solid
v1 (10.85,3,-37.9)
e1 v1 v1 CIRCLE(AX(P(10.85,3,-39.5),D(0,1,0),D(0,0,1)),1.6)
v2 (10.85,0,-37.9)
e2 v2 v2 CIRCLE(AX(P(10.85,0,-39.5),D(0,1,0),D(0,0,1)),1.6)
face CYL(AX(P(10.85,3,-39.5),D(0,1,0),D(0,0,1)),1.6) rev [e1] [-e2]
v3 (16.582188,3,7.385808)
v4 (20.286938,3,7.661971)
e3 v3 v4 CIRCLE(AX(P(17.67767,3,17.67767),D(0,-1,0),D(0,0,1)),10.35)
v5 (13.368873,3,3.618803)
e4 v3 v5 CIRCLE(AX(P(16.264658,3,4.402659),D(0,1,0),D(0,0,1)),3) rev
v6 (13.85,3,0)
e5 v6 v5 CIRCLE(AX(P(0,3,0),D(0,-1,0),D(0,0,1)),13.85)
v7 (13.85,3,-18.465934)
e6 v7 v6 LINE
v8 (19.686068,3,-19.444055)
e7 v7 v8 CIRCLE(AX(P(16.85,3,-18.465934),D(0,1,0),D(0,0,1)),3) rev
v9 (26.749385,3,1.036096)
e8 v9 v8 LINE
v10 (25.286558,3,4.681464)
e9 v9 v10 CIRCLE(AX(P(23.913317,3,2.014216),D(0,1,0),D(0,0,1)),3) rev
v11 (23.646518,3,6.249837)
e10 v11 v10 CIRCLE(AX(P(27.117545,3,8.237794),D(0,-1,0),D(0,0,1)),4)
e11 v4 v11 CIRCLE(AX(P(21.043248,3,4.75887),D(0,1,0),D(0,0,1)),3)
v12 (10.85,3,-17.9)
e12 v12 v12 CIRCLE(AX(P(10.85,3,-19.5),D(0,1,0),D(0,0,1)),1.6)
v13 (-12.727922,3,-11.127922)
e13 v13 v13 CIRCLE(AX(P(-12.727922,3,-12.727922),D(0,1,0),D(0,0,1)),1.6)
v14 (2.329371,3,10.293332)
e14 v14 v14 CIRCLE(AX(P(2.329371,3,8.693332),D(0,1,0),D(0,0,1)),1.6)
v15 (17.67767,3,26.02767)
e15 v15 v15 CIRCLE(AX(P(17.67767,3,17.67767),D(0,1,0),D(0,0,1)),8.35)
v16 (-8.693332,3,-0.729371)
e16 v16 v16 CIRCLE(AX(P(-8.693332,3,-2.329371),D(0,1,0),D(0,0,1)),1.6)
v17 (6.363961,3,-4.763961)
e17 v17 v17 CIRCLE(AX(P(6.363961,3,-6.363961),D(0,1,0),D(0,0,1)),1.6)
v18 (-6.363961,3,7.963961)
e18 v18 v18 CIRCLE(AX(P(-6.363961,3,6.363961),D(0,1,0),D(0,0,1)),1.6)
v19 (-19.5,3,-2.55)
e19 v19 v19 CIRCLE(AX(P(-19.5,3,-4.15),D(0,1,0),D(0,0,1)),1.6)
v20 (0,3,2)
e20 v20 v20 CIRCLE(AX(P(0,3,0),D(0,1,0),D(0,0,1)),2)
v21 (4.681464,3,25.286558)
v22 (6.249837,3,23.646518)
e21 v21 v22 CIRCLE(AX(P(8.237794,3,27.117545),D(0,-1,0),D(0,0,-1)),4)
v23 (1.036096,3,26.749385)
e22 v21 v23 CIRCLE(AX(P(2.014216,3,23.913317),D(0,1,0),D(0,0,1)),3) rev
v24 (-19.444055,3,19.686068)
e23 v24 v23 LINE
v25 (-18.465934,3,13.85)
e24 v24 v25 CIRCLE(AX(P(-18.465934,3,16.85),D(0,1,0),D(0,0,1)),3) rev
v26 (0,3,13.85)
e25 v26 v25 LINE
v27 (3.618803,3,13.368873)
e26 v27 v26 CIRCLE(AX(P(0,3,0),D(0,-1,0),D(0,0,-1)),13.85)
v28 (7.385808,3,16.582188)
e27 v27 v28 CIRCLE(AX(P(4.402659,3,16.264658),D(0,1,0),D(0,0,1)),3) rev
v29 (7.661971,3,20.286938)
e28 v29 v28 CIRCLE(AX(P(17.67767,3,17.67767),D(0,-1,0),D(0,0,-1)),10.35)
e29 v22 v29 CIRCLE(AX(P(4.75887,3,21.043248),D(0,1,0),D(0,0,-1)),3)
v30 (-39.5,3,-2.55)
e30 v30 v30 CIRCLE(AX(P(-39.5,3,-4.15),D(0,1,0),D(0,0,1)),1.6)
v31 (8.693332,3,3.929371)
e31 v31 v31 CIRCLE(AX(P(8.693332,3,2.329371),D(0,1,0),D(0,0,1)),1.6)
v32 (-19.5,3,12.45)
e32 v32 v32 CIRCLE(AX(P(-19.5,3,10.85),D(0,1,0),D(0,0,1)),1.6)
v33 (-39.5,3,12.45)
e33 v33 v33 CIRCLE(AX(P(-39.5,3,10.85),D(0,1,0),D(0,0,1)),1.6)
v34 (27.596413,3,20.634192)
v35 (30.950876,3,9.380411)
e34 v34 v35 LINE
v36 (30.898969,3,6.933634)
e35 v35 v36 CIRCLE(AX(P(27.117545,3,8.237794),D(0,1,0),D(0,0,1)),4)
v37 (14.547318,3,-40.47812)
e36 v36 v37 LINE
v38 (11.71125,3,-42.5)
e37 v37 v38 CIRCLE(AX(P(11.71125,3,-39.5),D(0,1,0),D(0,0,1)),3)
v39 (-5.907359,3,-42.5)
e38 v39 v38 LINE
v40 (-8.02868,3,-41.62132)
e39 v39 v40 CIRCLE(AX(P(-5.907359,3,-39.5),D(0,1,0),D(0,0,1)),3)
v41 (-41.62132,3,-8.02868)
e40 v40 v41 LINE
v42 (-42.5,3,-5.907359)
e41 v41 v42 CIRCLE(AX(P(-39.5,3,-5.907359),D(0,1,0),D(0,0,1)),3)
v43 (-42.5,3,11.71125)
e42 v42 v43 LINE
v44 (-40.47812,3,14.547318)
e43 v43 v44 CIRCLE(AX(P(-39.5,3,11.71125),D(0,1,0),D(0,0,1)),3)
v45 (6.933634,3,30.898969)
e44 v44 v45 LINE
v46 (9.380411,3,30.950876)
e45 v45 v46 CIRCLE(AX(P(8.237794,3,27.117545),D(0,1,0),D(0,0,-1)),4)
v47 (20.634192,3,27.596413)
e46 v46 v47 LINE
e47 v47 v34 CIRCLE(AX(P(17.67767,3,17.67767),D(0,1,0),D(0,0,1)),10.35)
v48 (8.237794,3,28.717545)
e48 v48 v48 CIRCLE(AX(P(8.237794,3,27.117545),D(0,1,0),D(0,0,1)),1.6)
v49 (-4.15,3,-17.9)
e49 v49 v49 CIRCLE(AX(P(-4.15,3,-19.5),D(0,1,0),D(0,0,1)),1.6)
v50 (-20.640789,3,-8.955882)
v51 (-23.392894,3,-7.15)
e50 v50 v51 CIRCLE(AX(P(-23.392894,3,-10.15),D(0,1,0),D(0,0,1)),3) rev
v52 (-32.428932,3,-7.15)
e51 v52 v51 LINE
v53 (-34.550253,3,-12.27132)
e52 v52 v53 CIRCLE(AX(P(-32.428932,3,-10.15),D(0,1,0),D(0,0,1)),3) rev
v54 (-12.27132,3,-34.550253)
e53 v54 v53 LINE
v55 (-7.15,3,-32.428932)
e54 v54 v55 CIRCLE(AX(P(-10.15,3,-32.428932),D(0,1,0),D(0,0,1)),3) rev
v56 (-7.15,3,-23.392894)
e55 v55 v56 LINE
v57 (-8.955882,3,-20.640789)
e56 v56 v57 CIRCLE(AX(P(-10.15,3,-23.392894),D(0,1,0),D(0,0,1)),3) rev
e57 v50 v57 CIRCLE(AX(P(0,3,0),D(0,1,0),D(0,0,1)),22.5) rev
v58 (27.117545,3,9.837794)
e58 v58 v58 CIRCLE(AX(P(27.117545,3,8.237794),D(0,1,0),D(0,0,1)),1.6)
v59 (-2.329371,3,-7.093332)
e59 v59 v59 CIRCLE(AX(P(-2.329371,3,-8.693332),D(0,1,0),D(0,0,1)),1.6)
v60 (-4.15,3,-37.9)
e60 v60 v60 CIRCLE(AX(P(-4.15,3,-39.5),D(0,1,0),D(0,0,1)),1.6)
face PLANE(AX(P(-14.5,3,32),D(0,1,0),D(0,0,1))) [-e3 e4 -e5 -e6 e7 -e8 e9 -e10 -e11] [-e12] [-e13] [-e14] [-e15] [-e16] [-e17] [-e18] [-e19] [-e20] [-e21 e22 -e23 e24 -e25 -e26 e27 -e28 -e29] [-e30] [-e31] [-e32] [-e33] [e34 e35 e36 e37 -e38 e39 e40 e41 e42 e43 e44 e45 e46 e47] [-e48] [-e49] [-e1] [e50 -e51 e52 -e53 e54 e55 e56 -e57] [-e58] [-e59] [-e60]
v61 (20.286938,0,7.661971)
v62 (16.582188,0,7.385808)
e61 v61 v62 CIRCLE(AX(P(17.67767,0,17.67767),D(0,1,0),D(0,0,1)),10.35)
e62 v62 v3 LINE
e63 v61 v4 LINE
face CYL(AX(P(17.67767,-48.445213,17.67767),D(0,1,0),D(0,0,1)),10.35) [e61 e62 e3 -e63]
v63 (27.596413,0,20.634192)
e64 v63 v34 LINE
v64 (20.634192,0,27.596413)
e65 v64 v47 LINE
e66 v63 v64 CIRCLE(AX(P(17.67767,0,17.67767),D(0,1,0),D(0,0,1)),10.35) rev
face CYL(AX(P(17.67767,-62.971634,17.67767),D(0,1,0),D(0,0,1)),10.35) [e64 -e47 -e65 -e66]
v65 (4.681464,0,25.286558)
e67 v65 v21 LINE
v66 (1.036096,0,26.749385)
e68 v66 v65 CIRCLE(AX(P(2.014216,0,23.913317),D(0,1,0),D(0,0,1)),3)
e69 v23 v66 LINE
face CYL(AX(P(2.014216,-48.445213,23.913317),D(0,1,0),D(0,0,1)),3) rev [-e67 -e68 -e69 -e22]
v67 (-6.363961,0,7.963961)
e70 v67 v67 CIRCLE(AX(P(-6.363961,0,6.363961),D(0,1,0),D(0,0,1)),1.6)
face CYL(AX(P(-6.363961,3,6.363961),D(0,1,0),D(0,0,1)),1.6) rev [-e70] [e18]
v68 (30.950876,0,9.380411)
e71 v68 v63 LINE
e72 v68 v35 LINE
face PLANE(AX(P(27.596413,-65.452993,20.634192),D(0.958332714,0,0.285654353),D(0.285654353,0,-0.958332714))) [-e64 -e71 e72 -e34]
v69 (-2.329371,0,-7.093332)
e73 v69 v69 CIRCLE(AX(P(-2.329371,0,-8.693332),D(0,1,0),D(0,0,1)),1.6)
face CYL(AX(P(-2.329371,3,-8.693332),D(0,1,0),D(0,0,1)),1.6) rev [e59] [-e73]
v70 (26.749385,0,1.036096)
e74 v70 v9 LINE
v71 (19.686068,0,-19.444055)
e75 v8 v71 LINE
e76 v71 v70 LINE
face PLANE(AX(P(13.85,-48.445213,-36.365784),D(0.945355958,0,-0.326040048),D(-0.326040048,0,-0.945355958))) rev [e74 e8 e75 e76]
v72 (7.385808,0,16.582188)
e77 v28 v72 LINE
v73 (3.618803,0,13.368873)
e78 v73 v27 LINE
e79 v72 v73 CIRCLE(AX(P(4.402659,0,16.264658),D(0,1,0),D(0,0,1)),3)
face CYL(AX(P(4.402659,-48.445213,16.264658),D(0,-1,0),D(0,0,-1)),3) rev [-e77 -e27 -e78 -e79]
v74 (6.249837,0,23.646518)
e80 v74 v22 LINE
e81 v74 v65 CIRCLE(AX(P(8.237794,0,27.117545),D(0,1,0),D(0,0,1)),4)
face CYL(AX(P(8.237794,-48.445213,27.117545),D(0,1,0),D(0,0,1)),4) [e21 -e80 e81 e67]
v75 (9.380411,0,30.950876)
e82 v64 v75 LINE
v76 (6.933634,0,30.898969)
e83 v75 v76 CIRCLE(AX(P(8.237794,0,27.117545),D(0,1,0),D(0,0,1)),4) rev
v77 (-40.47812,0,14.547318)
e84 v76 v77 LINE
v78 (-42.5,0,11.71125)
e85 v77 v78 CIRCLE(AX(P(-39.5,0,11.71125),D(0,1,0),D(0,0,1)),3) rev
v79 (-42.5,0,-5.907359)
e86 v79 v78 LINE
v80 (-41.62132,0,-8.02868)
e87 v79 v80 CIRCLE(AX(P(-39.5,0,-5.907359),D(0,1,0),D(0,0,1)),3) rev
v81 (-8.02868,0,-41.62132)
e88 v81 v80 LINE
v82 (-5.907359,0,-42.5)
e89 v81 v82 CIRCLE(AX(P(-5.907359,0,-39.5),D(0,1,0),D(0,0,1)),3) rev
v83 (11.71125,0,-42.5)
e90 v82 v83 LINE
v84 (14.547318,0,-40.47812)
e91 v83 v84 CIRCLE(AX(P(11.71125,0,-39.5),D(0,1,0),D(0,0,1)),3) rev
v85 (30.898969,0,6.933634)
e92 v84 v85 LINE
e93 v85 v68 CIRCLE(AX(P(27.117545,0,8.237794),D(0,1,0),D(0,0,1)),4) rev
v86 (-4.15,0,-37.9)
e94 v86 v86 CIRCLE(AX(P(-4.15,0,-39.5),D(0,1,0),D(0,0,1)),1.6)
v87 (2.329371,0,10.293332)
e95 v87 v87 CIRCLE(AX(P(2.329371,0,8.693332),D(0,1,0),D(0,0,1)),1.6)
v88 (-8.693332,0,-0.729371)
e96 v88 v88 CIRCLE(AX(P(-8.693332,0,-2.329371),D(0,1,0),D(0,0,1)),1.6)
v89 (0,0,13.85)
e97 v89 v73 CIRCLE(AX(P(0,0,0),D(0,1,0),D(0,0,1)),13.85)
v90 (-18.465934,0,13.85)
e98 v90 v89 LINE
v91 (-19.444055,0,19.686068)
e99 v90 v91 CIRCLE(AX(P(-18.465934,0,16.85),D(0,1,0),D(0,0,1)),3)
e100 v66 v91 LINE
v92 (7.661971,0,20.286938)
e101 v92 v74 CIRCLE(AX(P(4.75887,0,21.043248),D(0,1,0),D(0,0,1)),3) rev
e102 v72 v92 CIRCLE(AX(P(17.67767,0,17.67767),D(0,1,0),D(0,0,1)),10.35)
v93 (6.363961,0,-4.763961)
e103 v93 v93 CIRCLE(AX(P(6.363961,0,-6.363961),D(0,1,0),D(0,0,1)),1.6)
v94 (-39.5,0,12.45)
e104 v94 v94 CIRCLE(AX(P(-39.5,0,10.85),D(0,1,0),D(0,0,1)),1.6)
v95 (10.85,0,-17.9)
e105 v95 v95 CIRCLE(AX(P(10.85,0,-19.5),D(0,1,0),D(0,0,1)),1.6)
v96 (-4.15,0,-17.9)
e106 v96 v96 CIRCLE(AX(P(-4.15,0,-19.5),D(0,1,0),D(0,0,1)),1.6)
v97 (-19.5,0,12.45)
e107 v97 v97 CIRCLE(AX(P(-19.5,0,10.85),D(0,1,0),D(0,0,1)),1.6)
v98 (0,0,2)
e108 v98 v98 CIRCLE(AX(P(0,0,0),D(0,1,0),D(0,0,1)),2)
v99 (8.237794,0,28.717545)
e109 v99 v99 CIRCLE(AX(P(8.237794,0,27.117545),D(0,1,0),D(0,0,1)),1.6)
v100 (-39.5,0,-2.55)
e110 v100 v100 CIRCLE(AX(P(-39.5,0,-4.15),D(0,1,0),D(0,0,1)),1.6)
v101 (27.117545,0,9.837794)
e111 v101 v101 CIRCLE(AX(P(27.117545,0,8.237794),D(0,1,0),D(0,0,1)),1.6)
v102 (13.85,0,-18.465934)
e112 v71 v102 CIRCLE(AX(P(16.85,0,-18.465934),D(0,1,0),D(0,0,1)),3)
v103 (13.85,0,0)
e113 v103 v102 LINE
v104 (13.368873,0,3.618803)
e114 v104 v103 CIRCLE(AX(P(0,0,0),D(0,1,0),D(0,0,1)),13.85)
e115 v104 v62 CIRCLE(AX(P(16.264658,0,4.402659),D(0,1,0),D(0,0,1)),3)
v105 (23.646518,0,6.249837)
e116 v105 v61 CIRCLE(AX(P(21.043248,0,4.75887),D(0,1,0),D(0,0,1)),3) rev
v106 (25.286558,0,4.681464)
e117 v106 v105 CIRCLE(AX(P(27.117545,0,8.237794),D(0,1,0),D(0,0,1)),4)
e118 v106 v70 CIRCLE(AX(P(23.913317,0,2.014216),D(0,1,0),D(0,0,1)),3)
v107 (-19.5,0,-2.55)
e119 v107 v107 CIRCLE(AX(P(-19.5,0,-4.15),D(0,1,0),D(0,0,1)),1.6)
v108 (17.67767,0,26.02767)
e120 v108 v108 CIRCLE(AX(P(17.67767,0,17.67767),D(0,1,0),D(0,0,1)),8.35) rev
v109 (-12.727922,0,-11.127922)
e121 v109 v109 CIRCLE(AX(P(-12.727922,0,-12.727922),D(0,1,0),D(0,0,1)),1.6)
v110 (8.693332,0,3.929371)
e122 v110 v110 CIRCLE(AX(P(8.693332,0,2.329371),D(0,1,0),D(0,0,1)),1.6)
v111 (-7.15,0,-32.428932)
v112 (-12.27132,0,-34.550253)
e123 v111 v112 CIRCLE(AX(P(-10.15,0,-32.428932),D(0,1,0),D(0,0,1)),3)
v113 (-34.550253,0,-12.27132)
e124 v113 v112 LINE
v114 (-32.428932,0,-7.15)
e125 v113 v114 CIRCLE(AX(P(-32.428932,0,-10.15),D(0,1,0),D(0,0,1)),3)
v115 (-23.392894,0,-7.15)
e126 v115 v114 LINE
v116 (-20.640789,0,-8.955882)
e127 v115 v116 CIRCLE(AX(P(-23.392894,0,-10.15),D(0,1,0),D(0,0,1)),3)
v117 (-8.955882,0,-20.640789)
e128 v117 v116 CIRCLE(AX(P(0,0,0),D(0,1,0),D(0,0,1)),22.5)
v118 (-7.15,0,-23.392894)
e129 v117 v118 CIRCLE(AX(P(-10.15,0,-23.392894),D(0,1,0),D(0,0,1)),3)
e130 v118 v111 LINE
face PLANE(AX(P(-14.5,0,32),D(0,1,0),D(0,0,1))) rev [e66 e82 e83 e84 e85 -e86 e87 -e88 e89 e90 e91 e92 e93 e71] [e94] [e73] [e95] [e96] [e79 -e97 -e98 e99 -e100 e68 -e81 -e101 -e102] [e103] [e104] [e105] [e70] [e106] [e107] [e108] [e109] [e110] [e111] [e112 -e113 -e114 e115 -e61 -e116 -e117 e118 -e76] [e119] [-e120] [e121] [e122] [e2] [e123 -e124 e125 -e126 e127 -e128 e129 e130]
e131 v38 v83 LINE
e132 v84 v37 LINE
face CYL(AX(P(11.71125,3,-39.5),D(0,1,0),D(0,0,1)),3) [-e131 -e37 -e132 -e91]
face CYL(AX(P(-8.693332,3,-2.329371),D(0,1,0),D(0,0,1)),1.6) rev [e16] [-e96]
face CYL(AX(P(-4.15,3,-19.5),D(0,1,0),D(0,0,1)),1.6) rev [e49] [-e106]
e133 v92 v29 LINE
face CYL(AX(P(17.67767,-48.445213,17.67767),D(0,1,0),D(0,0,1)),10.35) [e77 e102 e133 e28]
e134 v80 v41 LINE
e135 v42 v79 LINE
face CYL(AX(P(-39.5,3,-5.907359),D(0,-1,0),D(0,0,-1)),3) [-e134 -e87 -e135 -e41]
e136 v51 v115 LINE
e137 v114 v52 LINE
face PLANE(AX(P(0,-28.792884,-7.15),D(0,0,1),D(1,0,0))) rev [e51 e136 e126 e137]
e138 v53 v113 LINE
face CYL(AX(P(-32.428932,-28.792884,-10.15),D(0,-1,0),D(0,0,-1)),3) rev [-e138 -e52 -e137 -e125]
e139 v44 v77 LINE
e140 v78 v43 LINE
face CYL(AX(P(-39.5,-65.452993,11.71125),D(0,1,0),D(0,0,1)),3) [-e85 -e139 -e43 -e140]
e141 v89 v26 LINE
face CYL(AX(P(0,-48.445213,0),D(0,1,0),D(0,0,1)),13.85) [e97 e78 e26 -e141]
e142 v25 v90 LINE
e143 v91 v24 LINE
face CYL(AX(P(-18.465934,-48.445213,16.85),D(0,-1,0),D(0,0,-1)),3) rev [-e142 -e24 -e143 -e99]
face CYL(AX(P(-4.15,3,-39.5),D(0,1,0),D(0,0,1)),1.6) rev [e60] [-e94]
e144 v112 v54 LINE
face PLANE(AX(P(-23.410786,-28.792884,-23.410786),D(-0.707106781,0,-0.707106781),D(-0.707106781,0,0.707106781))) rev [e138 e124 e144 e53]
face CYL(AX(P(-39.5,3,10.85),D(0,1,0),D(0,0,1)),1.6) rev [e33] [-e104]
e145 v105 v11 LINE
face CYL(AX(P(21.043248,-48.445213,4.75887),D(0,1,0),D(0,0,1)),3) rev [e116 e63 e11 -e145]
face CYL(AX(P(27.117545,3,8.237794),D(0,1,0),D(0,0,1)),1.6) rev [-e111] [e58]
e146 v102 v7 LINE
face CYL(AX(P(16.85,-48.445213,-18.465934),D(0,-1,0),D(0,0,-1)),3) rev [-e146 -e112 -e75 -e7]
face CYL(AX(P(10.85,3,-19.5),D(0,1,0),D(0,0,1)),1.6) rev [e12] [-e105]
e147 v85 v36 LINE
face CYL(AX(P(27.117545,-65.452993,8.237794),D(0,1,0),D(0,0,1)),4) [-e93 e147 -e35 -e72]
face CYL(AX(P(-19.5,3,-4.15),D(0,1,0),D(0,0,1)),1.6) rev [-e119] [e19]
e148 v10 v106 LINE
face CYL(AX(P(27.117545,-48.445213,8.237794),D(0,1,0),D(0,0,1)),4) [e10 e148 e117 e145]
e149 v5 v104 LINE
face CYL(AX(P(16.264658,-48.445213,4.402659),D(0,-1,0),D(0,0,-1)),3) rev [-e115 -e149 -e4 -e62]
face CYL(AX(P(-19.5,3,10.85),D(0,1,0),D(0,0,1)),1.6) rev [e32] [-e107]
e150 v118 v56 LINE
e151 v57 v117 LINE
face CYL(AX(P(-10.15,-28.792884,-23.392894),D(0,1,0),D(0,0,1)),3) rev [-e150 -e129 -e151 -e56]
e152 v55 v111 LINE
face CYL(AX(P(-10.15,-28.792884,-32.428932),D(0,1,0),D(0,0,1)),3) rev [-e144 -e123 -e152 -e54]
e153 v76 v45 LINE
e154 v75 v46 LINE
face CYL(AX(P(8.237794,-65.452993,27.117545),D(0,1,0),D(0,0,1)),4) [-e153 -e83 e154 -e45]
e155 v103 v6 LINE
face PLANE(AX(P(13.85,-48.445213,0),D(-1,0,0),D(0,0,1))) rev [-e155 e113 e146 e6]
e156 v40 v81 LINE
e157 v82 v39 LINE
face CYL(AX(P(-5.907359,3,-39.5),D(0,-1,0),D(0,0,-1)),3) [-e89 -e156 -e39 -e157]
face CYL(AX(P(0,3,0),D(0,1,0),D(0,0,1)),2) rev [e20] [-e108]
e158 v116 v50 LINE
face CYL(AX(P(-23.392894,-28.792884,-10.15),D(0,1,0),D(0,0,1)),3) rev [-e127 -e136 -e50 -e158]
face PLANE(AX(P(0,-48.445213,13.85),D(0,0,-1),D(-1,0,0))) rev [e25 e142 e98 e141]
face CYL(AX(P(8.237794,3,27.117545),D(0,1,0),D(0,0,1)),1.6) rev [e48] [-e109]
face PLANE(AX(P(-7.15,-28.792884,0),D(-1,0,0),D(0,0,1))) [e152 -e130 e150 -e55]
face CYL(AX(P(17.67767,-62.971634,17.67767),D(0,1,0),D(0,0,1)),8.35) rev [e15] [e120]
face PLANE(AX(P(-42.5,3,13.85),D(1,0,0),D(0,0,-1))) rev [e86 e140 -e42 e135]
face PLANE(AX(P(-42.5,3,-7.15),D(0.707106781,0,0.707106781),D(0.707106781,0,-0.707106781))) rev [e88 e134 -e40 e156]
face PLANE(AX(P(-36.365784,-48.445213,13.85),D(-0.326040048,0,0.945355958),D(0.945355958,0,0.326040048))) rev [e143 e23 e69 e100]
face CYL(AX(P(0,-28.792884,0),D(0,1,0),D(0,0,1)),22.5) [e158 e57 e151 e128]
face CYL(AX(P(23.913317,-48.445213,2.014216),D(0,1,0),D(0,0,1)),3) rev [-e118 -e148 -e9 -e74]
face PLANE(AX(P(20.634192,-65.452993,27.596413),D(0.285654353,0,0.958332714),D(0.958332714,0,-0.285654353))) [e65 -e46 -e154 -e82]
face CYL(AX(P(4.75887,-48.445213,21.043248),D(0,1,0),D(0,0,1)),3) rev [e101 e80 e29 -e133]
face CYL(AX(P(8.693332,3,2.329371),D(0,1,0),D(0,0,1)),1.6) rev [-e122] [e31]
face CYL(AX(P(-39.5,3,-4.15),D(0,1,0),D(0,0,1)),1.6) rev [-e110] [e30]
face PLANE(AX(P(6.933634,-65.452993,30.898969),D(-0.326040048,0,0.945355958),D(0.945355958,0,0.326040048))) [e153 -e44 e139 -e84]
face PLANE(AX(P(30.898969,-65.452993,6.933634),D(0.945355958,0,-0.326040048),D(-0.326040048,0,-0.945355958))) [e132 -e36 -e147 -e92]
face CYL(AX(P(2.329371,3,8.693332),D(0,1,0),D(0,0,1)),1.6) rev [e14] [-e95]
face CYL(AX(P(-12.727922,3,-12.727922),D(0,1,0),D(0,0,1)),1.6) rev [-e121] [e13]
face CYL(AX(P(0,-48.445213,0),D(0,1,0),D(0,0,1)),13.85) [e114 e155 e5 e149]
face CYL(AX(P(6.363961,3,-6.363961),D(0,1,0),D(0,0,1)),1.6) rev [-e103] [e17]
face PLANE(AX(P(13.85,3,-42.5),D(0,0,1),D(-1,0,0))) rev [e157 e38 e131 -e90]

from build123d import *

# Parameters (mm, degrees)
BOSS_EXTRUDE1_DEPTH      = 3
M3_CLEARANCE_HOLE1_D     = 3.2
M3_CLEARANCE_HOLE2_D     = 3.2
F_4_0_4_DIAMETER_HOLE1_D = 4
CUT_EXTRUDE3_DEPTH       = 3
FILLET5_R                = 3
M3_CLEARANCE_HOLE3_D     = 3.2
CUT_EXTRUDE4_START       = -3
CUT_EXTRUDE4_DEPTH       = 3
BOSS_EXTRUDE2_START      = -3
SKETCH17_R               = 8.35
BOSS_EXTRUDE2_DEPTH      = 3
BOSS_EXTRUDE3_START      = -3
BOSS_EXTRUDE3_DEPTH      = 3
M3_CLEARANCE_HOLE4_D     = 3.2
CUT_EXTRUDE5_START       = -3
CUT_EXTRUDE5_DEPTH       = 3
FILLET6_R                = 3
FILLET7_R                = 3


# Some blends are built 0.0001 mm under size
with BuildPart() as part:
    # Sketch2 → Boss-Extrude1 (new body)
    with BuildSketch(Plane(origin=(0, 0, 0), x_dir=(1, 0, 0), z_dir=(0, 1, 0))):
        with BuildLine():
            Line((-16.5, -13.85), (-42.5, -13.85))
            Line((-42.5, -13.85), (-42.5, 7.15))
            Line((-42.5, 7.15), (-24.825, 24.825))
            Line((-24.825, 24.825), (25.724873734, -25.724873734))
            Line((25.724873734, -25.724873734), (16.974873734, -34.474873734))
            ThreePointArc((16.974873734, -34.474873734), (14.482141695, -35.49995444), (12, -34.449489743))
            Line((12, -34.449489743), (12, -39))
            Line((12, -39), (-12, -39))
            Line((-12, -39), (-12, -34.449489743))
            ThreePointArc((-12, -34.449489743), (-17.17260394, -34.259908888), (-16.5, -29.127718677))
            Line((-16.5, -29.127718677), (-16.5, -13.85))
        make_face()
    extrude(amount=BOSS_EXTRUDE1_DEPTH)

    # Mirror5: part across plane


with BuildPart() as part_1:
    add(part.part)
    add(part.part.mirror(Plane(origin=(25.724873734, 3, 25.724873734), x_dir=(0.7071067811865465, 0, 0.7071067811865487), z_dir=(-0.7071067811865486, 0, 0.7071067811865465))))

    # M3 Clearance Hole1 (through all)
    with Locations(Plane(origin=(0, 3, 0), x_dir=(1, 0, 0), z_dir=(0, 1, 0))):
        with Locations((-39.5, 4.15), (-19.5, 4.15), (-19.5, -10.85), (-39.5, -10.85), (-4.15, 19.5), (-4.15, 39.5), (10.85, 39.5), (10.85, 19.5)):
            Hole(M3_CLEARANCE_HOLE1_D / 2)

    # M3 Clearance Hole2 (through all)
    with Locations(Plane(origin=(0, 3, 0), x_dir=(1, 0, 0), z_dir=(0, 1, 0))):
        with Locations((-2.329371406, 8.693332437), (6.363961031, 6.363961031), (8.693332437, -2.329371406), (2.329371406, -8.693332437), (-6.363961031, -6.363961031), (-8.693332437, 2.329371406)):
            Hole(M3_CLEARANCE_HOLE2_D / 2)

    # Ø4.0 (4) Diameter Hole1 (through all)
    with Locations(Plane(origin=(0, 3, 0), x_dir=(1, 0, 0), z_dir=(0, 1, 0))):
        with Locations((0, 0)):
            Hole(F_4_0_4_DIAMETER_HOLE1_D / 2)

    # Sketch13 → Cut-Extrude3 (cut)
    with BuildSketch(Plane(origin=(0, 3, 0), x_dir=(1, 0, 0), z_dir=(0, 1, 0))):
        with BuildLine():
            Line((-39.671572875, 7.15), (-21.333717444, 7.15))
            ThreePointArc((-21.333717444, 7.15), (-19.129970762, 11.844586048), (-15.909902577, 15.909902577))
            Line((-15.909902577, 15.909902577), (-23.410786438, 23.410786438))
            Line((-23.410786438, 23.410786438), (-39.671572875, 7.15))
        make_face()
    cut_extrude3 = extrude(amount=-CUT_EXTRUDE3_DEPTH, mode=Mode.SUBTRACT)

    # Mirror6: Cut-Extrude3 across plane
    add(cut_extrude3.mirror(Plane(origin=(0, -28.792883686, 0), x_dir=(0.7071067811865467, 0, 0.7071067811865482), z_dir=(-0.7071067811865482, 0, 0.7071067811865468))), mode=Mode.SUBTRACT)

    # Fillet5
    fillet5_edges = [part_1.edges().sort_by_distance(p)[0] for p in [
        (-21.333717444, 1.5, -7.15),
        (-39.671572875, 1.5, -7.15),
        (-7.15, 1.5, -21.333717444),
        (-7.15, 1.5, -39.671572875),
    ]]
    fillet(fillet5_edges, radius=FILLET5_R)

    # M3 Clearance Hole3 (through all)
    with Locations(Plane(origin=(0, 3, 0), x_dir=(1, 0, 0), z_dir=(0, 1, 0))):
        with Locations((-12.727922061, 12.727922061)):
            Hole(M3_CLEARANCE_HOLE3_D / 2)

    # Sketch16 → Cut-Extrude4 (cut)
    with BuildSketch(Plane(origin=(0, 3, 0), x_dir=(1, 0, 0), z_dir=(0, 1, 0)).offset(CUT_EXTRUDE4_START)):
        with BuildLine():
            Line((-16.5, -13.85), (-10.493288043, -8.808002387))
            ThreePointArc((-10.493288043, -8.808002387), (9.687362902, -9.687362902), (8.808002387, 10.493288043))
            Line((8.808002387, 10.493288043), (13.85, 16.5))
            Line((13.85, 16.5), (29.127718677, 16.5))
            ThreePointArc((29.127718677, 16.5), (34.259908888, 17.17260394), (34.449489743, 12))
            Line((34.449489743, 12), (39, 12))
            Line((39, 12), (39, -12))
            Line((39, -12), (34.449489743, -12))
            ThreePointArc((34.449489743, -12), (35.49995444, -14.482141695), (34.474873734, -16.974873734))
            Line((34.474873734, -16.974873734), (16.974873734, -34.474873734))
            ThreePointArc((16.974873734, -34.474873734), (14.482141695, -35.49995444), (12, -34.449489743))
            Line((12, -34.449489743), (12, -39))
            Line((12, -39), (-12, -39))
            Line((-12, -39), (-12, -34.449489743))
            ThreePointArc((-12, -34.449489743), (-17.17260394, -34.259908888), (-16.5, -29.127718677))
            Line((-16.5, -29.127718677), (-16.5, -13.85))
        make_face()
    extrude(amount=CUT_EXTRUDE4_DEPTH, mode=Mode.SUBTRACT)

    # Sketch17 → Boss-Extrude2 (add)
    with BuildSketch(Plane(origin=(0, 3, 0), x_dir=(1, 0, 0), z_dir=(0, 1, 0)).offset(BOSS_EXTRUDE2_START)):
        with BuildLine():
            Line((-16.5, -13.85), (13.483684727, -27.139856987))
            ThreePointArc((13.483684727, -27.139856987), (24.996224715, -24.996224715), (27.139856987, -13.483684727))
            Line((27.139856987, -13.483684727), (13.85, 16.5))
            Line((13.85, 16.5), (8.808002387, 10.493288043))
            ThreePointArc((8.808002387, 10.493288043), (9.687362902, -9.687362902), (-10.493288043, -8.808002387))
            Line((-10.493288043, -8.808002387), (-16.5, -13.85))
        make_face()
        with Locations(Location((17.67766953, -17.67766953, 0), (0, 0, 270))):
            Circle(SKETCH17_R, mode=Mode.SUBTRACT)
    extrude(amount=BOSS_EXTRUDE2_DEPTH)

    # Sketch18 → Boss-Extrude3 (add)
    with BuildSketch(Plane(origin=(0, 3, 0), x_dir=(1, 0, 0), z_dir=(0, 1, 0)).offset(BOSS_EXTRUDE3_START)):
        with BuildLine():
            Line((30.898968891, -6.933633811), (13.85, 42.5))
            Line((13.85, 42.5), (13.85, 16.5))
            Line((13.85, 16.5), (27.139856987, -13.483684727))
            ThreePointArc((27.139856987, -13.483684727), (28.006636609, -17.018170416), (27.596413119, -20.634192082))
            Line((27.596413119, -20.634192082), (30.950875914, -9.380411412))
            ThreePointArc((30.950875914, -9.380411412), (31.116645257, -8.152955318), (30.898968891, -6.933633811))
        make_face()
        with BuildLine():
            Line((-42.5, -13.85), (-16.5, -13.85))
            Line((-16.5, -13.85), (13.483684727, -27.139856987))
            ThreePointArc((13.483684727, -27.139856987), (17.018170416, -28.006636609), (20.634192082, -27.596413119))
            Line((20.634192082, -27.596413119), (9.380411412, -30.950875914))
            ThreePointArc((9.380411412, -30.950875914), (8.152955318, -31.116645257), (6.933633811, -30.898968891))
            Line((6.933633811, -30.898968891), (-42.5, -13.85))
        make_face()
    extrude(amount=BOSS_EXTRUDE3_DEPTH)

    # M3 Clearance Hole4 (through all)
    with Locations(Plane(origin=(0, 3, 0), x_dir=(1, 0, 0), z_dir=(0, 1, 0))):
        with Locations((8.237794001, -27.117545059), (27.117545059, -8.237794001)):
            Hole(M3_CLEARANCE_HOLE4_D / 2)

    # Sketch21 → Cut-Extrude5 (cut)
    with BuildSketch(Plane(origin=(0, 3, 0), x_dir=(1, 0, 0), z_dir=(0, 1, 0)).offset(CUT_EXTRUDE5_START)):
        with BuildLine():
            Line((13.85, 36.365784234), (27.878821119, -4.310904805))
            ThreePointArc((27.878821119, -4.310904805), (25.451546124, -4.601250649), (23.646518046, -6.249837391))
            ThreePointArc((23.646518046, -6.249837391), (22.205721923, -7.524489916), (20.286938067, -7.661970967))
            ThreePointArc((20.286938067, -7.661970967), (15.946603087, -7.473459175), (11.911266823, -9.082839698))
            Line((11.911266823, -9.082839698), (11.104995265, -8.27656814))
            ThreePointArc((11.104995265, -8.27656814), (13.145848858, -4.359949288), (13.85, 0))
            Line((13.85, 0), (13.85, 36.365784234))
        make_face()
        with BuildLine():
            Line((0, -13.85), (-36.365784234, -13.85))
            Line((-36.365784234, -13.85), (4.310904805, -27.878821119))
            ThreePointArc((4.310904805, -27.878821119), (4.601250649, -25.451546124), (6.249837391, -23.646518046))
            ThreePointArc((6.249837391, -23.646518046), (7.524489916, -22.205721923), (7.661970967, -20.286938067))
            ThreePointArc((7.661970967, -20.286938067), (7.473459175, -15.946603087), (9.082839698, -11.911266823))
            Line((9.082839698, -11.911266823), (8.27656814, -11.104995265))
            ThreePointArc((8.27656814, -11.104995265), (4.359949288, -13.145848858), (0, -13.85))
        make_face()
    extrude(amount=CUT_EXTRUDE5_DEPTH, mode=Mode.SUBTRACT)

    # Fillet6
    # the kernel refuses this fillet: 3 mm, written as the material it adds along each edge
    with BuildSketch(Plane(origin=(13.85, 0, -36.365784234), x_dir=(0, 0, 1), z_dir=(0, 1, 0)), Plane(origin=(-36.365784234, 0, 13.85), x_dir=(0.945355958029755, 0, 0.3260400475672341), z_dir=(0, 1, 0))) as fillet6_piece_1:
        with BuildLine():
            CenterArc((FILLET6_R * 5.96661659371, FILLET6_R), FILLET6_R, 109.02859786, 160.97140214)
            Line((FILLET6_R * 5.64057654615, FILLET6_R * 1.94535595803), (FILLET6_R * 5.63405574519, FILLET6_R * 1.96426307719))
            Line((FILLET6_R * 5.63405574519, FILLET6_R * 1.96426307719), (-FILLET6_R * 0.00652080095135, FILLET6_R * 0.0189071191606))
            Line((-FILLET6_R * 0.00652080095135, FILLET6_R * 0.0189071191606), (0, -FILLET6_R * 0.02))
            Line((0, -FILLET6_R * 0.02), (FILLET6_R * 5.96661659371, -FILLET6_R * 0.02))
            Line((FILLET6_R * 5.96661659371, -FILLET6_R * 0.02), (FILLET6_R * 5.96661659371, 0))
        make_face()
    extrude(amount=3)
    with BuildSketch(Plane(origin=(27.878821119, 0, 4.310904805), x_dir=(-0.32604004756723476, 0, -0.9453559580297546), z_dir=(0, 1, 0))) as fillet6_piece_2:
        with BuildLine():
            CenterArc((3.464101615, 3), FILLET6_R, 188.213210702, 81.786789298)
            Line((0.494871659, 2.571428571), (0.43548706, 2.562857143))
            ThreePointArc((0.43548706, 2.562857143), (0.404901579, 1.255409988), (-0.051961524, 0.03))
            Line((-0.051961524, 0.03), (0, -0.06))
            Line((0, -0.06), (3.464101615, -0.06))
            Line((3.464101615, -0.06), (3.464101615, 0))
        make_face()
    extrude(amount=3)
    with BuildSketch(Plane(origin=(11.104995265, 0, 8.27656814), x_dir=(0.7071067811869455, 0, 0.7071067811861494), z_dir=(0, 1, 0))) as fillet6_piece_3:
        with BuildLine():
            CenterArc((2.481144361, 2.683649746), FILLET6_R, 196.13857285, 47.312103401)
            Line((-0.400632365, 1.849765518), (-0.458267899, 1.833087834))
            ThreePointArc((-0.458267899, 1.833087834), (-0.227322426, 0.919033599), (-0.059371126, -0.00866426))
            Line((-0.059371126, -0.00866426), (0, -0.06))
            ThreePointArc((0, -0.06), (0.570120087, -0.06), (1.113422089, -0.053672995))
            Line((1.113422089, -0.053672995), (1.140240173, 0))
        make_face()
    extrude(amount=3)
    with BuildSketch(Plane(origin=(8.27656814, 0, 11.104995265), x_dir=(-0.8407620685724203, 0, 0.5414047876125816), z_dir=(0, 1, 0))) as fillet6_piece_4:
        with BuildLine():
            CenterArc((2.097634461, 2.992988969), FILLET6_R, 218.770003629, 47.312103401)
            Line((-0.241363262, 1.114401825), (-0.288143216, 1.076830083))
            ThreePointArc((-0.288143216, 1.076830083), (-0.179322004, 0.544500259), (-0.058640373, -0.012700654))
            Line((-0.058640373, -0.012700654), (0.004099611, -0.059859779))
            ThreePointArc((0.004099611, -0.059859779), (0.946326947, -0.027632406), (1.888554283, -0.059859779))
            Line((1.888554283, -0.059859779), (1.892653895, 0))
        make_face()
    extrude(amount=3)
    with BuildSketch(Plane(origin=(4.310904805, 0, 27.878821119), x_dir=(0.14150948766511262, 0, -0.98993689945408), z_dir=(0, 1, 0))) as fillet6_piece_5:
        with BuildLine():
            CenterArc((3.600595189, 2.834733548), FILLET6_R, 169.106605351, 81.786789298)
            Line((0.654653671, 3.401680257), (0.59573484, 3.413019191))
            Line((0.59573484, 3.413019191), (-0.05891883, 0.011338934))
            Line((-0.05891883, 0.011338934), (0.01963961, -0.056694671))
            ThreePointArc((0.01963961, -0.056694671), (1.309307341, 0.16035527), (2.598975073, -0.056694671))
            Line((2.598975073, -0.056694671), (2.618614683, 0))
        make_face()
    extrude(amount=3)

    # Fillet7
    fillet7_edges = [part_1.edges().sort_by_distance(p)[0] for p in [
        (11.911266823, 1.5, 9.082839698),
        (9.082839698, 1.5, 11.911266823),
        (-42.5, 1.5, -7.15),
        (-7.15, 1.5, -42.5),
        (13.85, 1.5, -42.5),
        (-42.5, 1.5, 13.85),
    ]]
    fillet(fillet7_edges, radius=FILLET7_R - 0.0001)  # a hair under: the kernel refuses the full size


solid = part_1.part
